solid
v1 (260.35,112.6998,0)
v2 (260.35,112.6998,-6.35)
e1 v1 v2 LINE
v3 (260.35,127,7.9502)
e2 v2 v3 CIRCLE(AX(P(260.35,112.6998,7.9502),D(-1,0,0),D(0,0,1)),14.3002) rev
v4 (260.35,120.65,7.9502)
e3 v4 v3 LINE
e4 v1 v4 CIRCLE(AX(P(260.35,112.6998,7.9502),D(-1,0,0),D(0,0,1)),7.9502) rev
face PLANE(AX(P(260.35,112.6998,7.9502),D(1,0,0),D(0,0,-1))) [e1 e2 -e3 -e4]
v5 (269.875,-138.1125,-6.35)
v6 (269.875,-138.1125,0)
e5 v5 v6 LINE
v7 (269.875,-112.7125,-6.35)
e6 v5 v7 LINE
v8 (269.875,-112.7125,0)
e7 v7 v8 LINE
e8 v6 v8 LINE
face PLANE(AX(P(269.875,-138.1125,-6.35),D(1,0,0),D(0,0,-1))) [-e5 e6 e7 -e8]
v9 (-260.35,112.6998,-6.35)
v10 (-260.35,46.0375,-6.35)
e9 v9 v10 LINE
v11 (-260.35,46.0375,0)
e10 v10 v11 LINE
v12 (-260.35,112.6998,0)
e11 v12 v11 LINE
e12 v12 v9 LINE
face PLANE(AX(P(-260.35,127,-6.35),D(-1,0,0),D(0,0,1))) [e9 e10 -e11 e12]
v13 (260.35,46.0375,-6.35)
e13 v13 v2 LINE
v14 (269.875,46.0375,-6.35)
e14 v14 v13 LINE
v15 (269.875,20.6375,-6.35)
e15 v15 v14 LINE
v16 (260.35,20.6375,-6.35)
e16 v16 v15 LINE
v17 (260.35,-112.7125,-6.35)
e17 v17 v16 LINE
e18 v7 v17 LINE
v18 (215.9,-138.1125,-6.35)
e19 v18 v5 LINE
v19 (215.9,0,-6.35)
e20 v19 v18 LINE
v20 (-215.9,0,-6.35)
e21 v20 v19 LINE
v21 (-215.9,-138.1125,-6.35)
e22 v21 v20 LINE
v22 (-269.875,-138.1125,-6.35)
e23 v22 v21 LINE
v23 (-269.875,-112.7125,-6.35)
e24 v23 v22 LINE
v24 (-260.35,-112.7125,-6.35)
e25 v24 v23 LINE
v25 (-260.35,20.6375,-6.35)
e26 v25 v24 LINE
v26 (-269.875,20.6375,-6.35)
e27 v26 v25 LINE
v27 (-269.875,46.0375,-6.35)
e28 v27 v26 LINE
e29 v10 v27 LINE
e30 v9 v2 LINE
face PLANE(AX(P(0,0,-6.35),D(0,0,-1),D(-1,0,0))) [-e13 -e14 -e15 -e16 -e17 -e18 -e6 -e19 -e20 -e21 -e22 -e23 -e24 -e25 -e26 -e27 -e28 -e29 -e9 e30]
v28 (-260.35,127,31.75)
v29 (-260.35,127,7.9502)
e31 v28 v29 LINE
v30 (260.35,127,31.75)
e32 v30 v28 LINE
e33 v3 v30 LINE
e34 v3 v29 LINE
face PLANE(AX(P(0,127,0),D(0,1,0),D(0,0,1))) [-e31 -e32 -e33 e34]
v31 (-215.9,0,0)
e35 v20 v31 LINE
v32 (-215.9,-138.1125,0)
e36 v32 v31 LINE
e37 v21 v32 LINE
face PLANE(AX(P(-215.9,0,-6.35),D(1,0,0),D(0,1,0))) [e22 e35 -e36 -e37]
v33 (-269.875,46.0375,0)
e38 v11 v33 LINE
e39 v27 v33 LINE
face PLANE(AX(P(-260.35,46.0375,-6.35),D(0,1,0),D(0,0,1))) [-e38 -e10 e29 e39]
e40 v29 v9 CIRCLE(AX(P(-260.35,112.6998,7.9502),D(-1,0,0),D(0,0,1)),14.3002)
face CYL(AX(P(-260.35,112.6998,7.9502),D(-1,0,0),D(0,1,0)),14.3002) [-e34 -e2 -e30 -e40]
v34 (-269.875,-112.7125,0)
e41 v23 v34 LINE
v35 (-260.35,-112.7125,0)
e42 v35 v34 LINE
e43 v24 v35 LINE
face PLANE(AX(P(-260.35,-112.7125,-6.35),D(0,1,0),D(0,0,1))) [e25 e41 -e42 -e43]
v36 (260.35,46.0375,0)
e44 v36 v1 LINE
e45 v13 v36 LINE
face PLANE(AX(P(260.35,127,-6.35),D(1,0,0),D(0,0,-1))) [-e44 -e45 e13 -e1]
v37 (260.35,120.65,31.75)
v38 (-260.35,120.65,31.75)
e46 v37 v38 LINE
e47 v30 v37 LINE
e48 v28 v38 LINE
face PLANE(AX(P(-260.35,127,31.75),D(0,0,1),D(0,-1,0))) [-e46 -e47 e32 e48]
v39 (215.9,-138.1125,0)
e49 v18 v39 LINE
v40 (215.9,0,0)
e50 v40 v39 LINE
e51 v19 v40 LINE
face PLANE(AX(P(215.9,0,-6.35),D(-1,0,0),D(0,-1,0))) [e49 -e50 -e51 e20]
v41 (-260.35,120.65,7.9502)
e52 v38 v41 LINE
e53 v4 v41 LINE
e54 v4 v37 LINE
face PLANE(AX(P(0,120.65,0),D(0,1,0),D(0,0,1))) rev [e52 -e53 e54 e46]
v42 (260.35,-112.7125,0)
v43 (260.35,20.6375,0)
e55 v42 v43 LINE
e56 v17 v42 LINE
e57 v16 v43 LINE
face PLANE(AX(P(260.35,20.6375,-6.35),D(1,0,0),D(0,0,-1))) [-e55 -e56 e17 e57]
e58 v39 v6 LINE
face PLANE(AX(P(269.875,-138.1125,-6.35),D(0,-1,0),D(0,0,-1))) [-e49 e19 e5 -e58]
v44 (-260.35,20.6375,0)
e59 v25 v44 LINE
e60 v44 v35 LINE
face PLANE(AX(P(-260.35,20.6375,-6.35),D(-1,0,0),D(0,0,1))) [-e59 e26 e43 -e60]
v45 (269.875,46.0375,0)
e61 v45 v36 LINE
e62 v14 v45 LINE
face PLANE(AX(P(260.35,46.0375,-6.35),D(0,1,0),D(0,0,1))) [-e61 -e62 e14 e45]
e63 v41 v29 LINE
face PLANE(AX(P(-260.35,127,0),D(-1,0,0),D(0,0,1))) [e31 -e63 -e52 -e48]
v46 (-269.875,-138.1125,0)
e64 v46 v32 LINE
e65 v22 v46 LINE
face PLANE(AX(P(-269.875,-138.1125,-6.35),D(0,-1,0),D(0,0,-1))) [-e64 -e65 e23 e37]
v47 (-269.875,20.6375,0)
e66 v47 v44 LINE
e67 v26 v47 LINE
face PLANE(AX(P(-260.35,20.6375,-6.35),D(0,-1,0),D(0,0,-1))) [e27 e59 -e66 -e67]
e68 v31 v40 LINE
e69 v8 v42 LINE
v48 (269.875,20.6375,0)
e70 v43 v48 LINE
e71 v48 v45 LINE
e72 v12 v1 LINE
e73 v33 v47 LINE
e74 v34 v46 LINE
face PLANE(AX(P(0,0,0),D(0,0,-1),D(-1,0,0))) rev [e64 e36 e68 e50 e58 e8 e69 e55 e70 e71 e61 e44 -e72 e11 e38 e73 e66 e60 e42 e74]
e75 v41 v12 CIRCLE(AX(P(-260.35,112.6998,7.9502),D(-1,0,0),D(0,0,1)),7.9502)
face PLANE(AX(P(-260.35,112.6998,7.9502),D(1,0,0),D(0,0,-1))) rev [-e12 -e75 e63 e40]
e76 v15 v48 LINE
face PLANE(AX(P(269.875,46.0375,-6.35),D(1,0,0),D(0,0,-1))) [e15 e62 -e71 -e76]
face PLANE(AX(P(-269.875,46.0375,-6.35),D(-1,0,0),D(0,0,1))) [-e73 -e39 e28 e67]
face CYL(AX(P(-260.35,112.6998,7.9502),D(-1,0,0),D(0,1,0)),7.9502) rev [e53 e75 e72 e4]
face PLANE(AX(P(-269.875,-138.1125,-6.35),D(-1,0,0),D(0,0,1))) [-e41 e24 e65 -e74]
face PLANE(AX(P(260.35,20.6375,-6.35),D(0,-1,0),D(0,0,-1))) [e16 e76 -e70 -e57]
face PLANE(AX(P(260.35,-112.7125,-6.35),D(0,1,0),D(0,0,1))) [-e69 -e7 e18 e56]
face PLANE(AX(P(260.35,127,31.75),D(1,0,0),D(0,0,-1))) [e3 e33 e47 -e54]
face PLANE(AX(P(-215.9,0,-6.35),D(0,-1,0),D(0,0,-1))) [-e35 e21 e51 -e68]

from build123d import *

# Parameters (mm, degrees)
BASE_FLANGE1_DEPTH           = 6.35
EDGE_FLANGE1_STRIP_W         = 41.3004
EDGE_FLANGE1_STRIP_H         = 6.35
EDGE_FLANGE1_STRIP_CUT_DEPTH = 520.7
EDGE_FLANGE1_DEPTH           = 520.7


# Sheet-metal steps are written as plain solids
with BuildPart() as part:
    # Sketch1 → Base-Flange1 (new body)
    with BuildSketch(Plane.XY):
        Polygon((-260.35, 127), (260.35, 127), (260.35, 46.0375), (269.875, 46.0375), (269.875, 20.6375), (260.35, 20.6375), (260.35, -112.7125), (269.875, -112.7125), (269.875, -138.1125), (215.9, -138.1125), (215.9, 0), (-215.9, 0), (-215.9, -138.1125), (-269.875, -138.1125), (-269.875, -112.7125), (-260.35, -112.7125), (-260.35, 20.6375), (-269.875, 20.6375), (-269.875, 46.0375), (-260.35, 46.0375), align=None)
    extrude(amount=-BASE_FLANGE1_DEPTH)

    # Edge-Flange1 strip (across the edge) → Edge-Flange1 strip cut (cut)
    with BuildSketch(Plane(origin=(260.35, 127, 0), x_dir=(0, -1, 0), z_dir=(-1, 0, 0))):
        with Locations((-6.35, -3.175)):
            Rectangle(EDGE_FLANGE1_STRIP_W, EDGE_FLANGE1_STRIP_H)
    extrude(amount=EDGE_FLANGE1_STRIP_CUT_DEPTH, mode=Mode.SUBTRACT)

    # Edge-Flange1 section (across the edge) → Edge-Flange1 (add)
    with BuildSketch(Plane(origin=(260.35, 127, 0), x_dir=(0, -1, 0), z_dir=(-1, 0, 0))):
        with BuildLine():
            Line((0, 7.9502), (0, 31.75))
            Line((0, 31.75), (6.35, 31.75))
            Line((6.35, 31.75), (6.35, 7.9502))
            ThreePointArc((6.35, 7.9502), (8.678559668, 2.328559668), (14.3002, 0))
            Line((14.3002, 0), (14.3002, -6.35))
            ThreePointArc((14.3002, -6.35), (4.188431608, -2.161568392), (0, 7.9502))
        make_face()
    extrude(amount=EDGE_FLANGE1_DEPTH)


solid = part.part
